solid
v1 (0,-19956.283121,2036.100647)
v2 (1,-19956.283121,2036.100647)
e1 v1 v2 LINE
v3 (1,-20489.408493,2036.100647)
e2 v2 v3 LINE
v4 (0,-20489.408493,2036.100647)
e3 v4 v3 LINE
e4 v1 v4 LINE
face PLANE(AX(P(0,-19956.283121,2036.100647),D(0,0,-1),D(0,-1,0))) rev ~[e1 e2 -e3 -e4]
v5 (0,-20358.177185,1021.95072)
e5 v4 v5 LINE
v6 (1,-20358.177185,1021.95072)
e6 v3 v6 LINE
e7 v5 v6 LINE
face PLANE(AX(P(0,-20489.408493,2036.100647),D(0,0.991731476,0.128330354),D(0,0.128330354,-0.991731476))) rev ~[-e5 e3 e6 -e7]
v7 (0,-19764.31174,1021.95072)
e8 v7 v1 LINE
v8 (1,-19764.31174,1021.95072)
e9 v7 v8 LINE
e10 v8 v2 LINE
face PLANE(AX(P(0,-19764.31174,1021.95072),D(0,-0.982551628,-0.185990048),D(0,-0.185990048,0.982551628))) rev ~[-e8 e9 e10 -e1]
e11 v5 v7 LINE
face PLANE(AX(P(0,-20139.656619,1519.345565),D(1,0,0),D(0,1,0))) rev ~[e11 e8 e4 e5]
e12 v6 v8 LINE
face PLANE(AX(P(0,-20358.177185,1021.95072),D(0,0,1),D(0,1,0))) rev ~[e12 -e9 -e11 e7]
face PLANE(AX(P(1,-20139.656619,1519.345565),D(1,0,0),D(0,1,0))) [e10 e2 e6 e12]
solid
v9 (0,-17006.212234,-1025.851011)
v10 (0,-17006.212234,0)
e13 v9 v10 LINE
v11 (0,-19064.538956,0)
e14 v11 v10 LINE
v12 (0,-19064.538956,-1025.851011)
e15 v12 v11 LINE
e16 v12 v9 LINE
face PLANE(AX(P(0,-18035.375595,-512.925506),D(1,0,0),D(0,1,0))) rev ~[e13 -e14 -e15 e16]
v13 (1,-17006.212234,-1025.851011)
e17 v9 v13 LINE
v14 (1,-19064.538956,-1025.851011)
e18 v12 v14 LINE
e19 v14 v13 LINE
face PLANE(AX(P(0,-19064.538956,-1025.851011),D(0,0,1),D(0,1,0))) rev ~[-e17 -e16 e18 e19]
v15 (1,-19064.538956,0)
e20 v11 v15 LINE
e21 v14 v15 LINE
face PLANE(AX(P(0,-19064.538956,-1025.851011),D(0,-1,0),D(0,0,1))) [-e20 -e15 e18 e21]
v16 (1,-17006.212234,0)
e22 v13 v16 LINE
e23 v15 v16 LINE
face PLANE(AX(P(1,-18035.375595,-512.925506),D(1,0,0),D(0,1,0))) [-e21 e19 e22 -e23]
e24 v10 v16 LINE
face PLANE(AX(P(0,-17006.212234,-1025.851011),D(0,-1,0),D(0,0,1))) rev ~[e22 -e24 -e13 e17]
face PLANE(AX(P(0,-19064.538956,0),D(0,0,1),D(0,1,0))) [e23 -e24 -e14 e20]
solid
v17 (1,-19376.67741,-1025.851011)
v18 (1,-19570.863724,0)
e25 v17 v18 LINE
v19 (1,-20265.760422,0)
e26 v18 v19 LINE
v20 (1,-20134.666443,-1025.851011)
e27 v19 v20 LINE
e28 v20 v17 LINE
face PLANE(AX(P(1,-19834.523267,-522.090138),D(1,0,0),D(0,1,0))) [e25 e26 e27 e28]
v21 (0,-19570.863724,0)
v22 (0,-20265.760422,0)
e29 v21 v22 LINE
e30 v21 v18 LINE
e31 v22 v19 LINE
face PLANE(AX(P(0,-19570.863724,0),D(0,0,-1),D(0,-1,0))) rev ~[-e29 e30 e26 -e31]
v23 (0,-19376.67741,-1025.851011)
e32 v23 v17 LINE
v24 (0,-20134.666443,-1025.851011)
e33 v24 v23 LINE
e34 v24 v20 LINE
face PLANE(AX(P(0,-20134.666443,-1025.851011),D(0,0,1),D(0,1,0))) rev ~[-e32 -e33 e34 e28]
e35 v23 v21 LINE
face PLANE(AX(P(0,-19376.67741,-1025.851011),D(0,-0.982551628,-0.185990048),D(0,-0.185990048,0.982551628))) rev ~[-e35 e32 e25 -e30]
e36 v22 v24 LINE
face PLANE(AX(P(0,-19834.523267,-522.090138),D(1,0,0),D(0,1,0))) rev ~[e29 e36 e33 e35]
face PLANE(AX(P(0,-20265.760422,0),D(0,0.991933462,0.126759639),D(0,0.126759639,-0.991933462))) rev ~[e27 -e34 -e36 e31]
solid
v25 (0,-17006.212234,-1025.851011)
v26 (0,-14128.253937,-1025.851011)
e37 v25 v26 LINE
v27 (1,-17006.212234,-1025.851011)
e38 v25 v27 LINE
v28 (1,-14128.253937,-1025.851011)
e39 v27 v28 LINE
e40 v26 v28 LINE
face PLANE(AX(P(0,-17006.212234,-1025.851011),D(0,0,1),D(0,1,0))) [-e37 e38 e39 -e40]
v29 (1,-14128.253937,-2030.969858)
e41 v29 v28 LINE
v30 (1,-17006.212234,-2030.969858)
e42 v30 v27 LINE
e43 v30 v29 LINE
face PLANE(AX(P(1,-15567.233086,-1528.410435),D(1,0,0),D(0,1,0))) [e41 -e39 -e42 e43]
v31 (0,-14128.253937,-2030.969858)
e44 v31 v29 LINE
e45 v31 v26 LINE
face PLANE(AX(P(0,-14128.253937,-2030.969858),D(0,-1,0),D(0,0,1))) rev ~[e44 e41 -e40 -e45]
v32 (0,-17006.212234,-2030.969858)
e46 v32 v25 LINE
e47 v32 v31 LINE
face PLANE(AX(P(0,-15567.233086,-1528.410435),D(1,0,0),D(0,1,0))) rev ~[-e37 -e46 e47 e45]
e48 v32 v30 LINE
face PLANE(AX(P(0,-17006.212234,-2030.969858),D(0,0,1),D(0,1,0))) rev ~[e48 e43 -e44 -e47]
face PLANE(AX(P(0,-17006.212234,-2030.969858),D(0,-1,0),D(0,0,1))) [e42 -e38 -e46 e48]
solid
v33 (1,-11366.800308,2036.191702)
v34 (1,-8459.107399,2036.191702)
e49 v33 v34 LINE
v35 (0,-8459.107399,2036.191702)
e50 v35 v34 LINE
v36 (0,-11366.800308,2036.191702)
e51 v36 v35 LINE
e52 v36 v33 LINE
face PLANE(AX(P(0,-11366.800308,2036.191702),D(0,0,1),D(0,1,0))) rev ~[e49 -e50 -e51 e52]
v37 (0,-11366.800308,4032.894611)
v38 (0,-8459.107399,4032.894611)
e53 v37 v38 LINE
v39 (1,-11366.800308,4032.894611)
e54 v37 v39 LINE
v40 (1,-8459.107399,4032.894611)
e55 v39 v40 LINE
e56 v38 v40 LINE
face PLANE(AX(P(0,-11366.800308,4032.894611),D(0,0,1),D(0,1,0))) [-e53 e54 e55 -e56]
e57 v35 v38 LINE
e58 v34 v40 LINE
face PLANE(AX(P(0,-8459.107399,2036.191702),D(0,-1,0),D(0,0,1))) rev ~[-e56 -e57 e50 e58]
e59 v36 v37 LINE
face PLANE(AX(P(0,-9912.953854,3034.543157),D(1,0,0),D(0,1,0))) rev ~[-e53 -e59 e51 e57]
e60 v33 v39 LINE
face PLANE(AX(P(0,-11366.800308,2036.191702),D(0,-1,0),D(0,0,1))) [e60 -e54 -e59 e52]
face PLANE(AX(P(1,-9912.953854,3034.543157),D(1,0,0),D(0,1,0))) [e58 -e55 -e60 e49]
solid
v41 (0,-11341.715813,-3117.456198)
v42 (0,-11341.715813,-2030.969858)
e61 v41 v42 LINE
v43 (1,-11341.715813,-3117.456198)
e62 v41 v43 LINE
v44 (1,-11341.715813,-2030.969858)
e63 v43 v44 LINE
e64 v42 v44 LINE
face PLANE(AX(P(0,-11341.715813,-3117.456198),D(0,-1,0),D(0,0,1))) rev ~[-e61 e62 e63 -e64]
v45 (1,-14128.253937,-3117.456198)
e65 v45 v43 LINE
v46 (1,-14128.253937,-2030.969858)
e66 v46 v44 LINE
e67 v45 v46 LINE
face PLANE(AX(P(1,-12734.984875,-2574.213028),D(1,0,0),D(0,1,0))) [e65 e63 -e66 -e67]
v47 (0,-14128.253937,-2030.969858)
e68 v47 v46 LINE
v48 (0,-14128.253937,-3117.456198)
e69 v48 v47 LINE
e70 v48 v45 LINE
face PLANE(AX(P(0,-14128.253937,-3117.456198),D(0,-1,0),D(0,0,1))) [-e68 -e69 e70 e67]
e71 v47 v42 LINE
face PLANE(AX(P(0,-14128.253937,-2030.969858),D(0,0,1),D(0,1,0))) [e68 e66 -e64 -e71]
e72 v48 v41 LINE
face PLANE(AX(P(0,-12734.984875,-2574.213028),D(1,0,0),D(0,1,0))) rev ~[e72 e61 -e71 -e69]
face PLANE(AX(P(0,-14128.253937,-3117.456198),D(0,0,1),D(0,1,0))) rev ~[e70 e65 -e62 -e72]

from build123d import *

# Parameters (mm, degrees)
F2_W     = 2786.5381240845
F2_H     = 1086.4863395691
F3_DEPTH = 1
F2_W_2   = 2877.9582977295
F2_H_2   = 1005.1188468933
F2_W_3   = 2058.3267211914
F2_H_3   = 1025.8510112762
F2_W_4   = 2907.6929092407
F2_H_4   = 1996.7029094696


with BuildPart() as f3:
    # F2 (on Right) → F3 (new body)
    with BuildSketch(Plane.YZ):
        with Locations((-12734.9848747253, -2574.2130279541)):
            Rectangle(F2_W, F2_H)
    extrude(amount=F3_DEPTH)


with BuildPart() as f3b:
    # F2 (on Right) → F3, piece 2 (new body)
    with BuildSketch(Plane.YZ):
        with Locations((-15567.2330856323, -1528.4104347229)):
            Rectangle(F2_W_2, F2_H_2)
    extrude(amount=F3_DEPTH)


with BuildPart() as f3c:
    # F2 (on Right) → F3, piece 3 (new body)
    with BuildSketch(Plane.YZ):
        with Locations((-18035.3755950928, -512.9255056381)):
            Rectangle(F2_W_3, F2_H_3)
    extrude(amount=F3_DEPTH)


with BuildPart() as f3d:
    # F2 (on Right) → F3, piece 4 (new body)
    with BuildSketch(Plane.YZ):
        Polygon((-19376.6774103795, -1025.8510112762), (-19570.8637237549, 0), (-20265.7604217529, 0), (-20134.6664428711, -1025.8510112762), align=None)
    extrude(amount=F3_DEPTH)


with BuildPart() as f3e:
    # F2 (on Right) → F3, piece 5 (new body)
    with BuildSketch(Plane.YZ):
        Polygon((-20358.1771850586, 1021.9507200357), (-19764.3117396887, 1021.9507200357), (-19956.2831208382, 2036.1006468002), (-20489.408493042, 2036.1006468002), align=None)
    extrude(amount=F3_DEPTH)


with BuildPart() as f3f:
    # F2 (on Right) → F3, piece 6 (new body)
    with BuildSketch(Plane.YZ):
        with Locations((-9912.9538536072, 3034.5431566238)):
            Rectangle(F2_W_4, F2_H_4)
    extrude(amount=F3_DEPTH)


solid = Compound([f3.part, f3b.part, f3c.part, f3d.part, f3e.part, f3f.part])
